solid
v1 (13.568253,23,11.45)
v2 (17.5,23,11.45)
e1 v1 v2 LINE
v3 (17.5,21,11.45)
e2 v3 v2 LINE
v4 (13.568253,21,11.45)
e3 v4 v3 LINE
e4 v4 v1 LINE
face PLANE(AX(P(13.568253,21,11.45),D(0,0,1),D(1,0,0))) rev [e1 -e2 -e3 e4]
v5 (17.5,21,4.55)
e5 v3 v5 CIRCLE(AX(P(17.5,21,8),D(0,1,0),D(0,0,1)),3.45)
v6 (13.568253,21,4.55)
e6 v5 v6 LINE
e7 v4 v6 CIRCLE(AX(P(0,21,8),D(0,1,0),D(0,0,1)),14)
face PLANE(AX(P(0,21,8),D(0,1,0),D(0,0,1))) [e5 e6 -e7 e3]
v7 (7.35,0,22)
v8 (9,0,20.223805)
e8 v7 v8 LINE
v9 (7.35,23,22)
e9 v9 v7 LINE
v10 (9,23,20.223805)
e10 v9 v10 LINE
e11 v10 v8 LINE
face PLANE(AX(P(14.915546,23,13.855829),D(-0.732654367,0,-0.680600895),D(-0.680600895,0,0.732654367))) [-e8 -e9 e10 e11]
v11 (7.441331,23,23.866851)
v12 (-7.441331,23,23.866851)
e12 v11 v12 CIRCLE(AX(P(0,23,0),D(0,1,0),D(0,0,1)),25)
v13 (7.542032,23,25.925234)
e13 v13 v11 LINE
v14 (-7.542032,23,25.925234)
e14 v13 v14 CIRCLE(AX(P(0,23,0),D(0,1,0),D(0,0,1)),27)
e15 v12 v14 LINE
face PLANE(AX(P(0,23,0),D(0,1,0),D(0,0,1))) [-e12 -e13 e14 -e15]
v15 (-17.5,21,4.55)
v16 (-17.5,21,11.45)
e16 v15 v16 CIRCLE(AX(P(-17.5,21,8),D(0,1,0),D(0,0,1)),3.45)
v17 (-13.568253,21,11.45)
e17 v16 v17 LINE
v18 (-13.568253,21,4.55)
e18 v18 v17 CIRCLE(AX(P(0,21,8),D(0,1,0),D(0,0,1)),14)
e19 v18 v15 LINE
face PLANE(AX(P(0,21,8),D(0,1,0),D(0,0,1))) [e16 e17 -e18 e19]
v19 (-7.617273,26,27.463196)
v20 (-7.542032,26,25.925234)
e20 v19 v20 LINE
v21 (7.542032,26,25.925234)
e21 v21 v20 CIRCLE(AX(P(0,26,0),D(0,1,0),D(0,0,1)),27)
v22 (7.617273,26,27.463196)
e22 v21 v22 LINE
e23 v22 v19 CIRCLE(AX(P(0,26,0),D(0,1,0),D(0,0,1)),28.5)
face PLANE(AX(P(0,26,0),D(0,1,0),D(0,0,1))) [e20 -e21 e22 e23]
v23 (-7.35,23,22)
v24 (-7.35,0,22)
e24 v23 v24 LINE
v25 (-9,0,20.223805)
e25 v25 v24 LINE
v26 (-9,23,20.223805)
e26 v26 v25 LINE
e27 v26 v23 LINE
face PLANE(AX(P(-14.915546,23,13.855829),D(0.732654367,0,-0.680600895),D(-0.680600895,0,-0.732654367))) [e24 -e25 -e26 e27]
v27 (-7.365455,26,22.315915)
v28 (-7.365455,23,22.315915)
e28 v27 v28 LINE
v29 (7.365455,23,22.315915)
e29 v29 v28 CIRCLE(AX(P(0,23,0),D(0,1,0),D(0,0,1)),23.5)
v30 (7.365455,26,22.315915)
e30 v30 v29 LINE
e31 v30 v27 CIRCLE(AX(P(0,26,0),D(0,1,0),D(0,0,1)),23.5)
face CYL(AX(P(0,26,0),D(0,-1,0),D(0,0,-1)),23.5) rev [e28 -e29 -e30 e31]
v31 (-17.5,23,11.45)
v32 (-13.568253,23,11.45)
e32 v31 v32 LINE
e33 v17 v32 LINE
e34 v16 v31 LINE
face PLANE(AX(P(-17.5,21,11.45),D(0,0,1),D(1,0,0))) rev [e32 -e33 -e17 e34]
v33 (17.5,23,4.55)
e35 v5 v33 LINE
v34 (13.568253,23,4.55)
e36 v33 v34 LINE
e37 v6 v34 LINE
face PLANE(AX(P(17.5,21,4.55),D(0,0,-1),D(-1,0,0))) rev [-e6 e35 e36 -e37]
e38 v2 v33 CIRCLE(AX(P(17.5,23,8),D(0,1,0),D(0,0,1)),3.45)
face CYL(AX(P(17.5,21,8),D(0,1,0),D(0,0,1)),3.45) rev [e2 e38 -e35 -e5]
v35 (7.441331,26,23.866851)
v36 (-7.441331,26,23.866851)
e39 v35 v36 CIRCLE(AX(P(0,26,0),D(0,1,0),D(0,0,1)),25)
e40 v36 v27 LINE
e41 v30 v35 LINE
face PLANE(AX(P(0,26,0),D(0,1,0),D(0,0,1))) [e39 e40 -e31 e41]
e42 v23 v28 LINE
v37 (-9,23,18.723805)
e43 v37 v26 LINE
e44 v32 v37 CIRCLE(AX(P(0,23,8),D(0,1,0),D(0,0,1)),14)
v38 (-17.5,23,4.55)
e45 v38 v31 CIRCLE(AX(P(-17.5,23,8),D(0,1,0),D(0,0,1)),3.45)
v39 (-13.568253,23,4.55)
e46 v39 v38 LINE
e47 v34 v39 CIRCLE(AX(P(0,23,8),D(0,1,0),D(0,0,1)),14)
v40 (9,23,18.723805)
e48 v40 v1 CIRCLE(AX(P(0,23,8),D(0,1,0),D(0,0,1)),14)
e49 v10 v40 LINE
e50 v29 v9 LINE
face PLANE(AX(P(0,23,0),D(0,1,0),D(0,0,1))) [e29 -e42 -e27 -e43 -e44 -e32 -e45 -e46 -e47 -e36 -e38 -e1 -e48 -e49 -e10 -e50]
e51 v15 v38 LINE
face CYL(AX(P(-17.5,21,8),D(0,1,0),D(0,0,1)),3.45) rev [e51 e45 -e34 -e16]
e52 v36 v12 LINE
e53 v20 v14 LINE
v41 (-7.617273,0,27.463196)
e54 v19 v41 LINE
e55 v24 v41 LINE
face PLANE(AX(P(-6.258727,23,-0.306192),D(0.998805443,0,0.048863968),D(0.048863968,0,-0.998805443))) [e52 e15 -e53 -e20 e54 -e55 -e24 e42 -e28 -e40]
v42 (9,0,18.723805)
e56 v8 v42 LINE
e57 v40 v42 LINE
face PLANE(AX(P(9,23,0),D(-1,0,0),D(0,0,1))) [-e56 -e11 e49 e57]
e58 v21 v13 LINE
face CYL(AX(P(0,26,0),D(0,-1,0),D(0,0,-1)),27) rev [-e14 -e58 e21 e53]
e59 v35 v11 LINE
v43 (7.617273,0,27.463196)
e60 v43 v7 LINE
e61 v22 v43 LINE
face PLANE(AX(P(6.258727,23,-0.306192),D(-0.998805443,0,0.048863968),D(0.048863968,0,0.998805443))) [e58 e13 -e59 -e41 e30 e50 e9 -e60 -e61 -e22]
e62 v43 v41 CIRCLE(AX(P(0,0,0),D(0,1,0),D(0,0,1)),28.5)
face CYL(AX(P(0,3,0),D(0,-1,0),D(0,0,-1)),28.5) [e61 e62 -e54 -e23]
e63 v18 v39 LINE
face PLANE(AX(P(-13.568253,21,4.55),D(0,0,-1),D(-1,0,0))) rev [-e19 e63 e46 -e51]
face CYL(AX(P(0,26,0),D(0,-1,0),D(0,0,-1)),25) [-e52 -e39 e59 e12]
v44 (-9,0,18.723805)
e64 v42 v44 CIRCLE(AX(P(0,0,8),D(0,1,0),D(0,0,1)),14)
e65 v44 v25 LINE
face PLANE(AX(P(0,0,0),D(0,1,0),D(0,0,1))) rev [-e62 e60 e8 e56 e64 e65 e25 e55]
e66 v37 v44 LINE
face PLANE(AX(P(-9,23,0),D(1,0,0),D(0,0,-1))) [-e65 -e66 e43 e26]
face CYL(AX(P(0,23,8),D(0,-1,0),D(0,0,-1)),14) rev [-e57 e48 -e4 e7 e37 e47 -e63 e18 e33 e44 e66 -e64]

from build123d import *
from build123d.topology import SkipClean

# Parameters (mm, degrees)
SKETCH1_R           = 28.5
BOSS_EXTRUDE1_DEPTH = 3
BOSS_EXTRUDE4_DEPTH = 20
BOSS_EXTRUDE7_DEPTH = 3
CUT_EXTRUDE1_START  = -2
CUT_EXTRUDE1_DEPTH  = 2
CUT_EXTRUDE5_START  = -4
CUT_EXTRUDE5_DEPTH  = 4


with BuildPart() as part:
    # Sketch1 → Boss-Extrude1 (new body)
    with BuildSketch(Plane(origin=(0, 0, 0), x_dir=(1, 0, 0), z_dir=(0, 1, 0))):
        Circle(SKETCH1_R)
    extrude(amount=BOSS_EXTRUDE1_DEPTH)

    # Sketch2 → Boss-Extrude4 (add)
    with BuildSketch(Plane(origin=(0, 3, 0), x_dir=(1, 0, 0), z_dir=(0, 1, 0))):
        with BuildLine():
            Line((-9, -20.223805295), (-9, -18.723805295))
            ThreePointArc((-9, -18.723805295), (-11.855740218, -15.445899804), (-13.568253388, -11.45))
            ThreePointArc((-13.568253388, -11.45), (-14, -8), (-13.568253388, -4.55))
            ThreePointArc((-13.568253388, -4.55), (0, 6), (13.568253388, -4.55))
            ThreePointArc((13.568253388, -4.55), (14, -8), (13.568253388, -11.45))
            ThreePointArc((13.568253388, -11.45), (11.855740218, -15.445899804), (9, -18.723805295))
            Line((9, -18.723805295), (9, -20.223805295))
            Line((9, -20.223805295), (7.35, -22))
            Line((7.35, -22), (7.617272727, -27.463196394))
            ThreePointArc((7.617272727, -27.463196394), (22.686364547, -17.250474302), (28.5, 0))
            ThreePointArc((28.5, 0), (-17.250474302, 22.686364547), (-7.617272727, -27.463196394))
            Line((-7.617272727, -27.463196394), (-7.35, -22))
            Line((-7.35, -22), (-9, -20.223805295))
        make_face()
    extrude(amount=BOSS_EXTRUDE4_DEPTH)

    # Sketch5 → Boss-Extrude7 (add)
    with BuildSketch(Plane(origin=(0, 23, 0), x_dir=(1, 0, 0), z_dir=(0, 1, 0))):
        with BuildLine():
            ThreePointArc((7.617272727, -27.463196394), (0, 28.5), (-7.617272727, -27.463196394))
            Line((-7.617272727, -27.463196394), (-7.542031899, -25.92523394))
            ThreePointArc((-7.542031899, -25.92523394), (0, 27), (7.542031899, -25.92523394))
            Line((7.542031899, -25.92523394), (7.617272727, -27.463196394))
        make_face()
        with BuildLine():
            ThreePointArc((7.441330866, -23.866851383), (0, 25), (-7.441330866, -23.866851383))
            Line((-7.441330866, -23.866851383), (-7.365455329, -22.315915124))
            ThreePointArc((-7.365455329, -22.315915124), (0, 23.5), (7.365455329, -22.315915124))
            Line((7.365455329, -22.315915124), (7.441330866, -23.866851383))
        make_face()
    extrude(amount=BOSS_EXTRUDE7_DEPTH)

    # Sketch6 → Cut-Extrude1 (cut)
    with SkipClean():  # the faces are left unmerged after this step: merging them gives an invalid solid
        with BuildSketch(Plane(origin=(0, 23, 0), x_dir=(1, 0, 0), z_dir=(0, 1, 0)).offset(CUT_EXTRUDE1_START)):
            with BuildLine():
                Line((13.568253388, -11.45), (17.5, -11.45))
                ThreePointArc((17.5, -11.45), (20.95, -8), (17.5, -4.55))
                Line((17.5, -4.55), (13.568253388, -4.55))
                ThreePointArc((13.568253388, -4.55), (0, 6), (-13.568253388, -4.55))
                Line((-13.568253388, -4.55), (-17.5, -4.55))
                ThreePointArc((-17.5, -4.55), (-20.95, -8), (-17.5, -11.45))
                Line((-17.5, -11.45), (-13.568253388, -11.45))
                ThreePointArc((-13.568253388, -11.45), (-11.855740218, -15.445899804), (-9, -18.723805295))
                Line((-9, -18.723805295), (-9, -20.223805295))
                Line((-9, -20.223805295), (-7.35, -22))
                Line((-7.35, -22), (-7.35, -25))
                Line((-7.35, -25), (7.35, -25))
                Line((7.35, -25), (7.35, -22))
                Line((7.35, -22), (9, -20.223805295))
                Line((9, -20.223805295), (9, -18.723805295))
                ThreePointArc((9, -18.723805295), (11.855740218, -15.445899804), (13.568253388, -11.45))
            make_face()
        extrude(amount=CUT_EXTRUDE1_DEPTH, mode=Mode.SUBTRACT)

    # Sketch7 → Cut-Extrude5 (cut)
    with BuildSketch(Plane(origin=(0, 3, 0), x_dir=(1, 0, 0), z_dir=(0, 1, 0)).offset(CUT_EXTRUDE5_START)):
        with BuildLine():
            Line((-9, -20.223805295), (-7.35, -22))
            Line((-7.35, -22), (-7.617272727, -27.463196394))
            ThreePointArc((-7.617272727, -27.463196394), (0, -28.5), (7.617272727, -27.463196394))
            Line((7.617272727, -27.463196394), (7.35, -22))
            Line((7.35, -22), (9, -20.223805295))
            Line((9, -20.223805295), (9, -18.723805295))
            ThreePointArc((9, -18.723805295), (0, 6), (-9, -18.723805295))
            Line((-9, -18.723805295), (-9, -20.223805295))
        make_face()
    extrude(amount=CUT_EXTRUDE5_DEPTH, mode=Mode.SUBTRACT)


solid = part.part
